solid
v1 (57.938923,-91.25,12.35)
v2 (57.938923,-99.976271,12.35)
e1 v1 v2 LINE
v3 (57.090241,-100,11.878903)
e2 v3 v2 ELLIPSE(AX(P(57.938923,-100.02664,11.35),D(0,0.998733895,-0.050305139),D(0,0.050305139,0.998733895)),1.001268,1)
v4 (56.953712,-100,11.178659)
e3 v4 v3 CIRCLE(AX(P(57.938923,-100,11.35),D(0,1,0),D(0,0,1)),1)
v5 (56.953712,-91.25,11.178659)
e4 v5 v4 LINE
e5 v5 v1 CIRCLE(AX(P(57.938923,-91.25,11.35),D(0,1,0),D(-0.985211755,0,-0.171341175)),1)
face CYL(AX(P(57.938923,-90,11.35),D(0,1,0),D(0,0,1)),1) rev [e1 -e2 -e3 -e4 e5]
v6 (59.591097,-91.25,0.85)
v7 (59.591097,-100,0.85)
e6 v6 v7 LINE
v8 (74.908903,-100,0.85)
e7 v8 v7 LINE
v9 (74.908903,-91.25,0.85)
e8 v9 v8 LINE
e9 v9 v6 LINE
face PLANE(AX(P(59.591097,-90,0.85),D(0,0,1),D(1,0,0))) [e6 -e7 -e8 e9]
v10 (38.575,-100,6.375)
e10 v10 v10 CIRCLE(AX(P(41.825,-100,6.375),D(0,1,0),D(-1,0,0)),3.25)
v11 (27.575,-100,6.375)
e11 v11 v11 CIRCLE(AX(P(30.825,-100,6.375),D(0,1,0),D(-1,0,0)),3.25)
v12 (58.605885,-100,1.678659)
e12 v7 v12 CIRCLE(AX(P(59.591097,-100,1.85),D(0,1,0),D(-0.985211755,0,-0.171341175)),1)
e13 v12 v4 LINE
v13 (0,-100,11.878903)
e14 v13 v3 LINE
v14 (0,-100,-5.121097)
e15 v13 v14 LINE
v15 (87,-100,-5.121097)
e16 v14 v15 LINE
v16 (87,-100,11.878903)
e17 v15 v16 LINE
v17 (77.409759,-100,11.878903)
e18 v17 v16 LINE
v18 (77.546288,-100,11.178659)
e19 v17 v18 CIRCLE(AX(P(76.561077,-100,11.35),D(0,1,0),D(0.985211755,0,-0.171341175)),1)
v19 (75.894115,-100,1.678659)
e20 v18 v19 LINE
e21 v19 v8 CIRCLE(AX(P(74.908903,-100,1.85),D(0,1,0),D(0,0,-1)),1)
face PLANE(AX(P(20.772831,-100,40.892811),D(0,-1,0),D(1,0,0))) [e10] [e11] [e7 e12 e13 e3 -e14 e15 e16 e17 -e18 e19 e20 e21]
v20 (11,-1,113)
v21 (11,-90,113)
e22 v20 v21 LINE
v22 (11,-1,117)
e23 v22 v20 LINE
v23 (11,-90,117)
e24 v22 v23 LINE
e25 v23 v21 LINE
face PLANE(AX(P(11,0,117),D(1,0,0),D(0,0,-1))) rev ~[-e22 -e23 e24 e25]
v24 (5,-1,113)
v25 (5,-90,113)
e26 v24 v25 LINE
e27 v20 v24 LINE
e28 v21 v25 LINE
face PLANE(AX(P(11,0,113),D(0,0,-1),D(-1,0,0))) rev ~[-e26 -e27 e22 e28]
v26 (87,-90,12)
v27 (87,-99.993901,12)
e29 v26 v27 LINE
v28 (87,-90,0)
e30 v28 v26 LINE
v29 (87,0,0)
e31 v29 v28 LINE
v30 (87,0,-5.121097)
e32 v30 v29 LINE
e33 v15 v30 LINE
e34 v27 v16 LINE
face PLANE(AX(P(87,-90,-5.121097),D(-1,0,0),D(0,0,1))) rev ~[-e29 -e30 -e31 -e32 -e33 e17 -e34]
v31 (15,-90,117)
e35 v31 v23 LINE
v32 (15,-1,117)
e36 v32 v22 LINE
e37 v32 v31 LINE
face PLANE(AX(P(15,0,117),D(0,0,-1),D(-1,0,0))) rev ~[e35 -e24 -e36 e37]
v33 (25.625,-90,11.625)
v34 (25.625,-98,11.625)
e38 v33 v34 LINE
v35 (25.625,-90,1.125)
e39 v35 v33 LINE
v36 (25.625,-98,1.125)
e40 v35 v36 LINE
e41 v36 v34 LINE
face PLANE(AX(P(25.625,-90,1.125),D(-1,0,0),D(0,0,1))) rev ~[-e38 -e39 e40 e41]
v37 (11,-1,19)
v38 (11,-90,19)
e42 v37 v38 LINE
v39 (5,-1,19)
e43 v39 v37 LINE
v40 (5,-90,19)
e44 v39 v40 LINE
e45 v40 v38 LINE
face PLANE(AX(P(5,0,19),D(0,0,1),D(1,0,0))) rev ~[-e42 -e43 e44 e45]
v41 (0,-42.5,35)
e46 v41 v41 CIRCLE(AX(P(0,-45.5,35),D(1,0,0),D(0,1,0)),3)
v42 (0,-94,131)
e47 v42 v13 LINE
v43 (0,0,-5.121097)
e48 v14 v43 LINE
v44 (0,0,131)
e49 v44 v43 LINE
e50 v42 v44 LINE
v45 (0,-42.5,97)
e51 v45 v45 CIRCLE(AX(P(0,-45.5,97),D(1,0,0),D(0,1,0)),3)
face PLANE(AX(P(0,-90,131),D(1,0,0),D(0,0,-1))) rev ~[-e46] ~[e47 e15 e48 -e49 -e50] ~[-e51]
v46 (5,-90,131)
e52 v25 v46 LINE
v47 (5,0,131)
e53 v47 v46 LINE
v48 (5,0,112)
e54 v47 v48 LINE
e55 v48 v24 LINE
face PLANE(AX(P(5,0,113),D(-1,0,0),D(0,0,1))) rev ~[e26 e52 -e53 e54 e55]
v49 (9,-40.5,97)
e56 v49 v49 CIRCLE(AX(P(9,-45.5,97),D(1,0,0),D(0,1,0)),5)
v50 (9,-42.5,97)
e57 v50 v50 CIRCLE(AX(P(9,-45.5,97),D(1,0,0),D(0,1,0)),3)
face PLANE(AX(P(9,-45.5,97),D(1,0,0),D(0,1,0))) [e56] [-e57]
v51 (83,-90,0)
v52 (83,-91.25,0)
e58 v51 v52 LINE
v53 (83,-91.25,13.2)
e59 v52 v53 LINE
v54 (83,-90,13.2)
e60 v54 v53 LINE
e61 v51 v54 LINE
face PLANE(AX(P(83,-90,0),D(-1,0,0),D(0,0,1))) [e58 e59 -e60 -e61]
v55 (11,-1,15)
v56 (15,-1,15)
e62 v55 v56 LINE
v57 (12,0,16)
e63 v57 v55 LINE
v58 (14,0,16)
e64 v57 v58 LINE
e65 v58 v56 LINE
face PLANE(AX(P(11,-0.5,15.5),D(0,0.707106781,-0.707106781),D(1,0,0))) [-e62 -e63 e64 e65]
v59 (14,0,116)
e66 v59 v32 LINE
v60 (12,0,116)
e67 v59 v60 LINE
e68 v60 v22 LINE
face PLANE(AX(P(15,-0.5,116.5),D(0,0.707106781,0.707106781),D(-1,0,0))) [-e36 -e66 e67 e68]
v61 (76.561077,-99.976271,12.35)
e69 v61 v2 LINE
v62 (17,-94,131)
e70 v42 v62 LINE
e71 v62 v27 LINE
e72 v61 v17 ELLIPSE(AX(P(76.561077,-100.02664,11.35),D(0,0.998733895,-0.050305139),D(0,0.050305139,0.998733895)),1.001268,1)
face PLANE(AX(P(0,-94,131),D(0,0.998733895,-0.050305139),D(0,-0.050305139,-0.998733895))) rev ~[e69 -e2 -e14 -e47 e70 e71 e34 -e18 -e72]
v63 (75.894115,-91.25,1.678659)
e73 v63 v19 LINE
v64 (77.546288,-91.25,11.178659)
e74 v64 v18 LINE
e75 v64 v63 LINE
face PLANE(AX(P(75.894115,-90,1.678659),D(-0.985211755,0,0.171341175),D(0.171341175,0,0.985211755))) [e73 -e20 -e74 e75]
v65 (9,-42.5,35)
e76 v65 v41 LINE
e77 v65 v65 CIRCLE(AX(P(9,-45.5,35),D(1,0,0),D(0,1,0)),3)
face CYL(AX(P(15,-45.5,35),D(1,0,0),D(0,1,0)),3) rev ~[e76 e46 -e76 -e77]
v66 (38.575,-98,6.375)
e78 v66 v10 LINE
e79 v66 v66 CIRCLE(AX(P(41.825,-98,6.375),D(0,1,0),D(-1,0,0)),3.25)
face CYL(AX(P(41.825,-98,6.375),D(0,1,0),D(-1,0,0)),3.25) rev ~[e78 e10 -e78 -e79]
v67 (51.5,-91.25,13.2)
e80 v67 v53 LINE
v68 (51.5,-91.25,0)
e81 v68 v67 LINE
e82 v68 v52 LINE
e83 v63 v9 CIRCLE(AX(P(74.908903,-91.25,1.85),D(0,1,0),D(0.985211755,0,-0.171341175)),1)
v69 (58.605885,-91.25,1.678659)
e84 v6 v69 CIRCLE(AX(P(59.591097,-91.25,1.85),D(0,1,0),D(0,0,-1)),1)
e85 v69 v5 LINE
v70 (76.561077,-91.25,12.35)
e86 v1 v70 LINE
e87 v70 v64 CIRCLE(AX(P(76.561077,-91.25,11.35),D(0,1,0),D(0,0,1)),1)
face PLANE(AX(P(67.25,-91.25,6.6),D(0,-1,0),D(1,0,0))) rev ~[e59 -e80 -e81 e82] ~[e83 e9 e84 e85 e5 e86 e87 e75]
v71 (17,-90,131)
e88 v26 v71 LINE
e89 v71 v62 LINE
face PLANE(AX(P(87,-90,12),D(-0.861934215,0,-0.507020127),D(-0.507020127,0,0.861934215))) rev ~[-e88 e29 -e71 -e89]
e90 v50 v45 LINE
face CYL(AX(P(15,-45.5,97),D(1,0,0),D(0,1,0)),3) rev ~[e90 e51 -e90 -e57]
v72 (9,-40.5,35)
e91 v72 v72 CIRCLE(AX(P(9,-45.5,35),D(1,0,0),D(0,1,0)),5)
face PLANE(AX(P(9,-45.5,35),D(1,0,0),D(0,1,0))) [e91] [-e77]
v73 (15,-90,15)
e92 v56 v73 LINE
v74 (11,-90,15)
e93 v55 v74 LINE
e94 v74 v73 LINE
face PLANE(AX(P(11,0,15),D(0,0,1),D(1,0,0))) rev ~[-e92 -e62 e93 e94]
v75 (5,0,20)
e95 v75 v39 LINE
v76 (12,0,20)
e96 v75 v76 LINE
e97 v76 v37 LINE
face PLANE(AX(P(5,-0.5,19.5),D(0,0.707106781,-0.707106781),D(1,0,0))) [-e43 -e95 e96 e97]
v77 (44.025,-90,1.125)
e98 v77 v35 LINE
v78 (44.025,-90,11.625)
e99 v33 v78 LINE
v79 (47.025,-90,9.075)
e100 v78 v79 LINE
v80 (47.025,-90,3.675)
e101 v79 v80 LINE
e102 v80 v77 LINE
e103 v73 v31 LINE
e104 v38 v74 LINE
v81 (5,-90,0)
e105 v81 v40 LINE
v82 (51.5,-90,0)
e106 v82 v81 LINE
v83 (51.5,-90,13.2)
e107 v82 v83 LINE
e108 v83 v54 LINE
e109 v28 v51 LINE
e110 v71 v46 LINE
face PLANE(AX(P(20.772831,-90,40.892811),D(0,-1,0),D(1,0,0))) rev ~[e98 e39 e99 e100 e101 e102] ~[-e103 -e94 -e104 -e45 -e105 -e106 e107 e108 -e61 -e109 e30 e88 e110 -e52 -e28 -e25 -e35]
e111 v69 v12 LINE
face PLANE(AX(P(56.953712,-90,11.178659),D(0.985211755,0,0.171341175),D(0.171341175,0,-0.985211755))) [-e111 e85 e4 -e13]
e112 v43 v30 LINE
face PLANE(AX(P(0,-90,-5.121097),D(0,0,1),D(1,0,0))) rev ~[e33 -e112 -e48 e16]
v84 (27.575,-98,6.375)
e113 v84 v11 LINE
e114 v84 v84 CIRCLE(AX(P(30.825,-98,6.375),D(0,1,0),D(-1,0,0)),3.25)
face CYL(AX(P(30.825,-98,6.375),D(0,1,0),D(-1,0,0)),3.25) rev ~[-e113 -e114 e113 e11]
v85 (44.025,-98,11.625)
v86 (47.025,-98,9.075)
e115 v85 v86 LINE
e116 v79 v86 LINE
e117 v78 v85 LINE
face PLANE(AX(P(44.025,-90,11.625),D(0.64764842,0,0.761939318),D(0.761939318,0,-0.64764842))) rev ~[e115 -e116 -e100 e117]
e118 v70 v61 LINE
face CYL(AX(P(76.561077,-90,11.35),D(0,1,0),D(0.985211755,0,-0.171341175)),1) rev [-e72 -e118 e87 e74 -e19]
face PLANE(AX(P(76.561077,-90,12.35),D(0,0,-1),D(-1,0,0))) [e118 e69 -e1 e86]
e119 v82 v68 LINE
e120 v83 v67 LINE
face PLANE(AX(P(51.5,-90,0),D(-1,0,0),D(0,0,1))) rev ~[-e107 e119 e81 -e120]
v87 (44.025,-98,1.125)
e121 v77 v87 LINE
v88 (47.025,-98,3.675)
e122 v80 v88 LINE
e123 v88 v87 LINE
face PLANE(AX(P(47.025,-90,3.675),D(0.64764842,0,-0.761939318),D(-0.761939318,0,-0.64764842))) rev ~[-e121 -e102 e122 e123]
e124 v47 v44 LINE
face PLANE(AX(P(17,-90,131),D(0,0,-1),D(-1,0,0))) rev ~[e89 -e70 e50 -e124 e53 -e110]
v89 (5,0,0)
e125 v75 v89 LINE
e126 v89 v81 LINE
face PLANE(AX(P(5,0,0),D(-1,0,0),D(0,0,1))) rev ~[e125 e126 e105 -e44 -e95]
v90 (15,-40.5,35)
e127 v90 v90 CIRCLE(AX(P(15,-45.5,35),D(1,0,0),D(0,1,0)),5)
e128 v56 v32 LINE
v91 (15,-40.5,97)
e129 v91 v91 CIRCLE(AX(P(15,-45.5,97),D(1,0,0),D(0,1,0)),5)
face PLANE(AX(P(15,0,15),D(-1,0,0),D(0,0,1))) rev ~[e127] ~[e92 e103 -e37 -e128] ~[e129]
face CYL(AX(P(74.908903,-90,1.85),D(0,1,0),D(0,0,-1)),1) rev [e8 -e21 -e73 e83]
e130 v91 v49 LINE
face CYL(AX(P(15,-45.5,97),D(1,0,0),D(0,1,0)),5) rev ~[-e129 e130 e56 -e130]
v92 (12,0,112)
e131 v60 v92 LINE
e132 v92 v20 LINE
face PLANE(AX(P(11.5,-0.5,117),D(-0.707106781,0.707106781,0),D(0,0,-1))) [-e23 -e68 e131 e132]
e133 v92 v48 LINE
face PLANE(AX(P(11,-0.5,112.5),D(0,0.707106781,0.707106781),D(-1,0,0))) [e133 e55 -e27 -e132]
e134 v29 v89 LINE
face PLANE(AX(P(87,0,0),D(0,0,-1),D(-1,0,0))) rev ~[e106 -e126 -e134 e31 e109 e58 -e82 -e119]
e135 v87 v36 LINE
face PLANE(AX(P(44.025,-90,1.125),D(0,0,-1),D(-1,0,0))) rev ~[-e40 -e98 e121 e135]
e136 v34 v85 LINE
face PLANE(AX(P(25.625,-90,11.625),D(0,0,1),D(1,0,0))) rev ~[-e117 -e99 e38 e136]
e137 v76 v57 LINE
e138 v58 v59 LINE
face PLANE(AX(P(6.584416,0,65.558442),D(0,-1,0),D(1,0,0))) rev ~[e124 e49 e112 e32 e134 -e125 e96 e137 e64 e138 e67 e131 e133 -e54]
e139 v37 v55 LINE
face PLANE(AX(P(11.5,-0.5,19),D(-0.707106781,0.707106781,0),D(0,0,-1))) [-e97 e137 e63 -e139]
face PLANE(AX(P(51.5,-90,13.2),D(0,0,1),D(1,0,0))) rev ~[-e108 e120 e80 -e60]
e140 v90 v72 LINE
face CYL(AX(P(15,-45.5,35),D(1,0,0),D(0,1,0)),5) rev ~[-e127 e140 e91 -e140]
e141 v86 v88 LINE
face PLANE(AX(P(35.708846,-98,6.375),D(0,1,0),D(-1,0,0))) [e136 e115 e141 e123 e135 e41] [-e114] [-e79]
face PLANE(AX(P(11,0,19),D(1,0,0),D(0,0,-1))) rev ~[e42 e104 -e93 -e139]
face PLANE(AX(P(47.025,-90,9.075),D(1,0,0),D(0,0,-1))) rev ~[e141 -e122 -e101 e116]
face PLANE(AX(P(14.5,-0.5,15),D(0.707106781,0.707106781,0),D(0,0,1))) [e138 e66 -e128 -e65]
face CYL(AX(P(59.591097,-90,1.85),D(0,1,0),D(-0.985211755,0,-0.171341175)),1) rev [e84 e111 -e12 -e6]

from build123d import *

# Parameters (mm, degrees)
F1_DEPTH  = 90
F3_DEPTH  = 10
F5_DEPTH  = 90
F6_SIZE   = 1
F8_DEPTH  = 8
F9_R      = 3.25
F10_DEPTH = 25
F12_DEPTH = 25
F11_W     = 31.5
F11_H     = 13.2
F13_DEPTH = 1.25
F14_R     = 5
F14_R_2   = 3
F15_DEPTH = 6
F16_DEPTH = 25


with BuildPart() as f1:
    # F0 (on Front) → F1 (new body)
    with BuildSketch(Plane.XZ):
        Polygon((5, 131), (0, 131), (0, 0), (5, 0), (5, 19), (11, 19), (11, 15), (15, 15), (15, 117), (11, 117), (11, 113), (5, 113), align=None)
        Polygon((5, 0), (0, 0), (0, -5.121096503), (87, -5.121096503), (87, 0), align=None)
    extrude(amount=F1_DEPTH)

    # F2 (on face) → F3 (join)
    with BuildSketch(Plane.XZ.offset(90)):
        Polygon((87, -5.121096503), (87, 0), (5, 0), (5, 19), (11, 19), (11, 15), (15, 15), (15, 117), (11, 117), (11, 113), (5, 113), (5, 131), (0, 131), (0, -5.121096503), align=None)
        Polygon((5, 0), (87, 0), (87, 12), (17, 131), (5, 131), (5, 113), (11, 113), (11, 117), (15, 117), (15, 15), (11, 15), (11, 19), (5, 19), align=None)
    extrude(amount=F3_DEPTH)

    # F4 (on face) → F5 (cut)
    with BuildSketch(Plane(origin=(0, 0, 0), x_dir=(0, -1, 0), z_dir=(-1, 0, 0))):
        Polygon((100, 131), (94, 131), (100, 11.878903497), align=None)
    extrude(amount=-F5_DEPTH, mode=Mode.SUBTRACT)

    # F6
    f6_edges = [f1.edges().sort_by_distance(p)[0] for p in [
        (8, 0, 113),
        (11, 0, 115),
        (13, 0, 117),
        (15, 0, 66),
        (13, 0, 15),
        (11, 0, 17),
        (8, 0, 19),
    ]]
    chamfer(f6_edges, length=F6_SIZE)

    # F7 (on face) → F8 (cut)
    with BuildSketch(Plane(origin=(0, -90, 0), x_dir=(-1, 0, 0), z_dir=(0, 1, 0))):
        Polygon((-25.625, 1.125), (-25.625, 11.625), (-44.025, 11.625), (-47.025, 9.075), (-47.025, 3.675), (-44.025, 1.125), align=None)
    extrude(amount=-F8_DEPTH, mode=Mode.SUBTRACT)

    # F9 (on face) → F10 (cut)
    with BuildSketch(Plane(origin=(0, -98, 0), x_dir=(-1, 0, 0), z_dir=(0, 1, 0))):
        with Locations((-41.825, 6.375)):
            Circle(F9_R)
        with Locations((-30.825, 6.375)):
            Circle(F9_R)
    extrude(amount=-F10_DEPTH, mode=Mode.SUBTRACT)

    # F11 (on face) → F12 (cut)
    with BuildSketch(Plane.XZ.offset(90)):
        with BuildLine():
            ThreePointArc((58.6058854217, 1.6786588252), (58.9474129273, 1.0847088218), (59.5910971765, 0.85))
            Line((59.5910971765, 0.85), (74.9089028235, 0.85))
            ThreePointArc((74.9089028235, 0.85), (75.5525870727, 1.0847088218), (75.8941145783, 1.6786588252))
            Line((75.8941145783, 1.6786588252), (77.5462884913, 11.1786588252))
            ThreePointArc((77.5462884913, 11.1786588252), (77.3263679147, 11.9936842492), (76.5610767365, 12.35))
            Line((76.5610767365, 12.35), (57.9389232635, 12.35))
            ThreePointArc((57.9389232635, 12.35), (57.1736320853, 11.9936842492), (56.9537115087, 11.1786588252))
            Line((56.9537115087, 11.1786588252), (58.6058854217, 1.6786588252))
        make_face()
    extrude(amount=F12_DEPTH, mode=Mode.SUBTRACT)

    # F11 (on face) → F13 (cut)
    with BuildSketch(Plane.XZ.offset(90)):
        with Locations((67.25, 6.6)):
            Rectangle(F11_W, F11_H)
        with BuildLine():
            Line((74.9089028235, 0.85), (59.5910971765, 0.85))
            ThreePointArc((59.5910971765, 0.85), (58.9474129273, 1.0847088218), (58.6058854217, 1.6786588252))
            Line((58.6058854217, 1.6786588252), (56.9537115087, 11.1786588252))
            ThreePointArc((56.9537115087, 11.1786588252), (57.1736320853, 11.9936842492), (57.9389232635, 12.35))
            Line((57.9389232635, 12.35), (76.5610767365, 12.35))
            ThreePointArc((76.5610767365, 12.35), (77.3263679147, 11.9936842492), (77.5462884913, 11.1786588252))
            Line((77.5462884913, 11.1786588252), (75.8941145783, 1.6786588252))
            ThreePointArc((75.8941145783, 1.6786588252), (75.5525870727, 1.0847088218), (74.9089028235, 0.85))
        make_face(mode=Mode.SUBTRACT)
    extrude(amount=F13_DEPTH, mode=Mode.SUBTRACT)

    # F14 (on face) → F15 (cut)
    with BuildSketch(Plane.YZ.offset(15)):
        with Locations((-45.5, 97)):
            Circle(F14_R)
        with Locations((-45.5, 97)):
            Circle(F14_R_2, mode=Mode.SUBTRACT)
        with Locations((-45.5, 35)):
            Circle(F14_R)
        with Locations((-45.5, 35)):
            Circle(F14_R_2, mode=Mode.SUBTRACT)
    extrude(amount=-F15_DEPTH, mode=Mode.SUBTRACT)

    # F16 (cut): faces of the model
    f16_faces = [f1.faces().sort_by_distance(p)[0] for p in [
        (15, -45.5, 97),
        (15, -45.5, 35),
    ]]
    extrude(f16_faces, amount=-F16_DEPTH, mode=Mode.SUBTRACT)


solid = f1.part
